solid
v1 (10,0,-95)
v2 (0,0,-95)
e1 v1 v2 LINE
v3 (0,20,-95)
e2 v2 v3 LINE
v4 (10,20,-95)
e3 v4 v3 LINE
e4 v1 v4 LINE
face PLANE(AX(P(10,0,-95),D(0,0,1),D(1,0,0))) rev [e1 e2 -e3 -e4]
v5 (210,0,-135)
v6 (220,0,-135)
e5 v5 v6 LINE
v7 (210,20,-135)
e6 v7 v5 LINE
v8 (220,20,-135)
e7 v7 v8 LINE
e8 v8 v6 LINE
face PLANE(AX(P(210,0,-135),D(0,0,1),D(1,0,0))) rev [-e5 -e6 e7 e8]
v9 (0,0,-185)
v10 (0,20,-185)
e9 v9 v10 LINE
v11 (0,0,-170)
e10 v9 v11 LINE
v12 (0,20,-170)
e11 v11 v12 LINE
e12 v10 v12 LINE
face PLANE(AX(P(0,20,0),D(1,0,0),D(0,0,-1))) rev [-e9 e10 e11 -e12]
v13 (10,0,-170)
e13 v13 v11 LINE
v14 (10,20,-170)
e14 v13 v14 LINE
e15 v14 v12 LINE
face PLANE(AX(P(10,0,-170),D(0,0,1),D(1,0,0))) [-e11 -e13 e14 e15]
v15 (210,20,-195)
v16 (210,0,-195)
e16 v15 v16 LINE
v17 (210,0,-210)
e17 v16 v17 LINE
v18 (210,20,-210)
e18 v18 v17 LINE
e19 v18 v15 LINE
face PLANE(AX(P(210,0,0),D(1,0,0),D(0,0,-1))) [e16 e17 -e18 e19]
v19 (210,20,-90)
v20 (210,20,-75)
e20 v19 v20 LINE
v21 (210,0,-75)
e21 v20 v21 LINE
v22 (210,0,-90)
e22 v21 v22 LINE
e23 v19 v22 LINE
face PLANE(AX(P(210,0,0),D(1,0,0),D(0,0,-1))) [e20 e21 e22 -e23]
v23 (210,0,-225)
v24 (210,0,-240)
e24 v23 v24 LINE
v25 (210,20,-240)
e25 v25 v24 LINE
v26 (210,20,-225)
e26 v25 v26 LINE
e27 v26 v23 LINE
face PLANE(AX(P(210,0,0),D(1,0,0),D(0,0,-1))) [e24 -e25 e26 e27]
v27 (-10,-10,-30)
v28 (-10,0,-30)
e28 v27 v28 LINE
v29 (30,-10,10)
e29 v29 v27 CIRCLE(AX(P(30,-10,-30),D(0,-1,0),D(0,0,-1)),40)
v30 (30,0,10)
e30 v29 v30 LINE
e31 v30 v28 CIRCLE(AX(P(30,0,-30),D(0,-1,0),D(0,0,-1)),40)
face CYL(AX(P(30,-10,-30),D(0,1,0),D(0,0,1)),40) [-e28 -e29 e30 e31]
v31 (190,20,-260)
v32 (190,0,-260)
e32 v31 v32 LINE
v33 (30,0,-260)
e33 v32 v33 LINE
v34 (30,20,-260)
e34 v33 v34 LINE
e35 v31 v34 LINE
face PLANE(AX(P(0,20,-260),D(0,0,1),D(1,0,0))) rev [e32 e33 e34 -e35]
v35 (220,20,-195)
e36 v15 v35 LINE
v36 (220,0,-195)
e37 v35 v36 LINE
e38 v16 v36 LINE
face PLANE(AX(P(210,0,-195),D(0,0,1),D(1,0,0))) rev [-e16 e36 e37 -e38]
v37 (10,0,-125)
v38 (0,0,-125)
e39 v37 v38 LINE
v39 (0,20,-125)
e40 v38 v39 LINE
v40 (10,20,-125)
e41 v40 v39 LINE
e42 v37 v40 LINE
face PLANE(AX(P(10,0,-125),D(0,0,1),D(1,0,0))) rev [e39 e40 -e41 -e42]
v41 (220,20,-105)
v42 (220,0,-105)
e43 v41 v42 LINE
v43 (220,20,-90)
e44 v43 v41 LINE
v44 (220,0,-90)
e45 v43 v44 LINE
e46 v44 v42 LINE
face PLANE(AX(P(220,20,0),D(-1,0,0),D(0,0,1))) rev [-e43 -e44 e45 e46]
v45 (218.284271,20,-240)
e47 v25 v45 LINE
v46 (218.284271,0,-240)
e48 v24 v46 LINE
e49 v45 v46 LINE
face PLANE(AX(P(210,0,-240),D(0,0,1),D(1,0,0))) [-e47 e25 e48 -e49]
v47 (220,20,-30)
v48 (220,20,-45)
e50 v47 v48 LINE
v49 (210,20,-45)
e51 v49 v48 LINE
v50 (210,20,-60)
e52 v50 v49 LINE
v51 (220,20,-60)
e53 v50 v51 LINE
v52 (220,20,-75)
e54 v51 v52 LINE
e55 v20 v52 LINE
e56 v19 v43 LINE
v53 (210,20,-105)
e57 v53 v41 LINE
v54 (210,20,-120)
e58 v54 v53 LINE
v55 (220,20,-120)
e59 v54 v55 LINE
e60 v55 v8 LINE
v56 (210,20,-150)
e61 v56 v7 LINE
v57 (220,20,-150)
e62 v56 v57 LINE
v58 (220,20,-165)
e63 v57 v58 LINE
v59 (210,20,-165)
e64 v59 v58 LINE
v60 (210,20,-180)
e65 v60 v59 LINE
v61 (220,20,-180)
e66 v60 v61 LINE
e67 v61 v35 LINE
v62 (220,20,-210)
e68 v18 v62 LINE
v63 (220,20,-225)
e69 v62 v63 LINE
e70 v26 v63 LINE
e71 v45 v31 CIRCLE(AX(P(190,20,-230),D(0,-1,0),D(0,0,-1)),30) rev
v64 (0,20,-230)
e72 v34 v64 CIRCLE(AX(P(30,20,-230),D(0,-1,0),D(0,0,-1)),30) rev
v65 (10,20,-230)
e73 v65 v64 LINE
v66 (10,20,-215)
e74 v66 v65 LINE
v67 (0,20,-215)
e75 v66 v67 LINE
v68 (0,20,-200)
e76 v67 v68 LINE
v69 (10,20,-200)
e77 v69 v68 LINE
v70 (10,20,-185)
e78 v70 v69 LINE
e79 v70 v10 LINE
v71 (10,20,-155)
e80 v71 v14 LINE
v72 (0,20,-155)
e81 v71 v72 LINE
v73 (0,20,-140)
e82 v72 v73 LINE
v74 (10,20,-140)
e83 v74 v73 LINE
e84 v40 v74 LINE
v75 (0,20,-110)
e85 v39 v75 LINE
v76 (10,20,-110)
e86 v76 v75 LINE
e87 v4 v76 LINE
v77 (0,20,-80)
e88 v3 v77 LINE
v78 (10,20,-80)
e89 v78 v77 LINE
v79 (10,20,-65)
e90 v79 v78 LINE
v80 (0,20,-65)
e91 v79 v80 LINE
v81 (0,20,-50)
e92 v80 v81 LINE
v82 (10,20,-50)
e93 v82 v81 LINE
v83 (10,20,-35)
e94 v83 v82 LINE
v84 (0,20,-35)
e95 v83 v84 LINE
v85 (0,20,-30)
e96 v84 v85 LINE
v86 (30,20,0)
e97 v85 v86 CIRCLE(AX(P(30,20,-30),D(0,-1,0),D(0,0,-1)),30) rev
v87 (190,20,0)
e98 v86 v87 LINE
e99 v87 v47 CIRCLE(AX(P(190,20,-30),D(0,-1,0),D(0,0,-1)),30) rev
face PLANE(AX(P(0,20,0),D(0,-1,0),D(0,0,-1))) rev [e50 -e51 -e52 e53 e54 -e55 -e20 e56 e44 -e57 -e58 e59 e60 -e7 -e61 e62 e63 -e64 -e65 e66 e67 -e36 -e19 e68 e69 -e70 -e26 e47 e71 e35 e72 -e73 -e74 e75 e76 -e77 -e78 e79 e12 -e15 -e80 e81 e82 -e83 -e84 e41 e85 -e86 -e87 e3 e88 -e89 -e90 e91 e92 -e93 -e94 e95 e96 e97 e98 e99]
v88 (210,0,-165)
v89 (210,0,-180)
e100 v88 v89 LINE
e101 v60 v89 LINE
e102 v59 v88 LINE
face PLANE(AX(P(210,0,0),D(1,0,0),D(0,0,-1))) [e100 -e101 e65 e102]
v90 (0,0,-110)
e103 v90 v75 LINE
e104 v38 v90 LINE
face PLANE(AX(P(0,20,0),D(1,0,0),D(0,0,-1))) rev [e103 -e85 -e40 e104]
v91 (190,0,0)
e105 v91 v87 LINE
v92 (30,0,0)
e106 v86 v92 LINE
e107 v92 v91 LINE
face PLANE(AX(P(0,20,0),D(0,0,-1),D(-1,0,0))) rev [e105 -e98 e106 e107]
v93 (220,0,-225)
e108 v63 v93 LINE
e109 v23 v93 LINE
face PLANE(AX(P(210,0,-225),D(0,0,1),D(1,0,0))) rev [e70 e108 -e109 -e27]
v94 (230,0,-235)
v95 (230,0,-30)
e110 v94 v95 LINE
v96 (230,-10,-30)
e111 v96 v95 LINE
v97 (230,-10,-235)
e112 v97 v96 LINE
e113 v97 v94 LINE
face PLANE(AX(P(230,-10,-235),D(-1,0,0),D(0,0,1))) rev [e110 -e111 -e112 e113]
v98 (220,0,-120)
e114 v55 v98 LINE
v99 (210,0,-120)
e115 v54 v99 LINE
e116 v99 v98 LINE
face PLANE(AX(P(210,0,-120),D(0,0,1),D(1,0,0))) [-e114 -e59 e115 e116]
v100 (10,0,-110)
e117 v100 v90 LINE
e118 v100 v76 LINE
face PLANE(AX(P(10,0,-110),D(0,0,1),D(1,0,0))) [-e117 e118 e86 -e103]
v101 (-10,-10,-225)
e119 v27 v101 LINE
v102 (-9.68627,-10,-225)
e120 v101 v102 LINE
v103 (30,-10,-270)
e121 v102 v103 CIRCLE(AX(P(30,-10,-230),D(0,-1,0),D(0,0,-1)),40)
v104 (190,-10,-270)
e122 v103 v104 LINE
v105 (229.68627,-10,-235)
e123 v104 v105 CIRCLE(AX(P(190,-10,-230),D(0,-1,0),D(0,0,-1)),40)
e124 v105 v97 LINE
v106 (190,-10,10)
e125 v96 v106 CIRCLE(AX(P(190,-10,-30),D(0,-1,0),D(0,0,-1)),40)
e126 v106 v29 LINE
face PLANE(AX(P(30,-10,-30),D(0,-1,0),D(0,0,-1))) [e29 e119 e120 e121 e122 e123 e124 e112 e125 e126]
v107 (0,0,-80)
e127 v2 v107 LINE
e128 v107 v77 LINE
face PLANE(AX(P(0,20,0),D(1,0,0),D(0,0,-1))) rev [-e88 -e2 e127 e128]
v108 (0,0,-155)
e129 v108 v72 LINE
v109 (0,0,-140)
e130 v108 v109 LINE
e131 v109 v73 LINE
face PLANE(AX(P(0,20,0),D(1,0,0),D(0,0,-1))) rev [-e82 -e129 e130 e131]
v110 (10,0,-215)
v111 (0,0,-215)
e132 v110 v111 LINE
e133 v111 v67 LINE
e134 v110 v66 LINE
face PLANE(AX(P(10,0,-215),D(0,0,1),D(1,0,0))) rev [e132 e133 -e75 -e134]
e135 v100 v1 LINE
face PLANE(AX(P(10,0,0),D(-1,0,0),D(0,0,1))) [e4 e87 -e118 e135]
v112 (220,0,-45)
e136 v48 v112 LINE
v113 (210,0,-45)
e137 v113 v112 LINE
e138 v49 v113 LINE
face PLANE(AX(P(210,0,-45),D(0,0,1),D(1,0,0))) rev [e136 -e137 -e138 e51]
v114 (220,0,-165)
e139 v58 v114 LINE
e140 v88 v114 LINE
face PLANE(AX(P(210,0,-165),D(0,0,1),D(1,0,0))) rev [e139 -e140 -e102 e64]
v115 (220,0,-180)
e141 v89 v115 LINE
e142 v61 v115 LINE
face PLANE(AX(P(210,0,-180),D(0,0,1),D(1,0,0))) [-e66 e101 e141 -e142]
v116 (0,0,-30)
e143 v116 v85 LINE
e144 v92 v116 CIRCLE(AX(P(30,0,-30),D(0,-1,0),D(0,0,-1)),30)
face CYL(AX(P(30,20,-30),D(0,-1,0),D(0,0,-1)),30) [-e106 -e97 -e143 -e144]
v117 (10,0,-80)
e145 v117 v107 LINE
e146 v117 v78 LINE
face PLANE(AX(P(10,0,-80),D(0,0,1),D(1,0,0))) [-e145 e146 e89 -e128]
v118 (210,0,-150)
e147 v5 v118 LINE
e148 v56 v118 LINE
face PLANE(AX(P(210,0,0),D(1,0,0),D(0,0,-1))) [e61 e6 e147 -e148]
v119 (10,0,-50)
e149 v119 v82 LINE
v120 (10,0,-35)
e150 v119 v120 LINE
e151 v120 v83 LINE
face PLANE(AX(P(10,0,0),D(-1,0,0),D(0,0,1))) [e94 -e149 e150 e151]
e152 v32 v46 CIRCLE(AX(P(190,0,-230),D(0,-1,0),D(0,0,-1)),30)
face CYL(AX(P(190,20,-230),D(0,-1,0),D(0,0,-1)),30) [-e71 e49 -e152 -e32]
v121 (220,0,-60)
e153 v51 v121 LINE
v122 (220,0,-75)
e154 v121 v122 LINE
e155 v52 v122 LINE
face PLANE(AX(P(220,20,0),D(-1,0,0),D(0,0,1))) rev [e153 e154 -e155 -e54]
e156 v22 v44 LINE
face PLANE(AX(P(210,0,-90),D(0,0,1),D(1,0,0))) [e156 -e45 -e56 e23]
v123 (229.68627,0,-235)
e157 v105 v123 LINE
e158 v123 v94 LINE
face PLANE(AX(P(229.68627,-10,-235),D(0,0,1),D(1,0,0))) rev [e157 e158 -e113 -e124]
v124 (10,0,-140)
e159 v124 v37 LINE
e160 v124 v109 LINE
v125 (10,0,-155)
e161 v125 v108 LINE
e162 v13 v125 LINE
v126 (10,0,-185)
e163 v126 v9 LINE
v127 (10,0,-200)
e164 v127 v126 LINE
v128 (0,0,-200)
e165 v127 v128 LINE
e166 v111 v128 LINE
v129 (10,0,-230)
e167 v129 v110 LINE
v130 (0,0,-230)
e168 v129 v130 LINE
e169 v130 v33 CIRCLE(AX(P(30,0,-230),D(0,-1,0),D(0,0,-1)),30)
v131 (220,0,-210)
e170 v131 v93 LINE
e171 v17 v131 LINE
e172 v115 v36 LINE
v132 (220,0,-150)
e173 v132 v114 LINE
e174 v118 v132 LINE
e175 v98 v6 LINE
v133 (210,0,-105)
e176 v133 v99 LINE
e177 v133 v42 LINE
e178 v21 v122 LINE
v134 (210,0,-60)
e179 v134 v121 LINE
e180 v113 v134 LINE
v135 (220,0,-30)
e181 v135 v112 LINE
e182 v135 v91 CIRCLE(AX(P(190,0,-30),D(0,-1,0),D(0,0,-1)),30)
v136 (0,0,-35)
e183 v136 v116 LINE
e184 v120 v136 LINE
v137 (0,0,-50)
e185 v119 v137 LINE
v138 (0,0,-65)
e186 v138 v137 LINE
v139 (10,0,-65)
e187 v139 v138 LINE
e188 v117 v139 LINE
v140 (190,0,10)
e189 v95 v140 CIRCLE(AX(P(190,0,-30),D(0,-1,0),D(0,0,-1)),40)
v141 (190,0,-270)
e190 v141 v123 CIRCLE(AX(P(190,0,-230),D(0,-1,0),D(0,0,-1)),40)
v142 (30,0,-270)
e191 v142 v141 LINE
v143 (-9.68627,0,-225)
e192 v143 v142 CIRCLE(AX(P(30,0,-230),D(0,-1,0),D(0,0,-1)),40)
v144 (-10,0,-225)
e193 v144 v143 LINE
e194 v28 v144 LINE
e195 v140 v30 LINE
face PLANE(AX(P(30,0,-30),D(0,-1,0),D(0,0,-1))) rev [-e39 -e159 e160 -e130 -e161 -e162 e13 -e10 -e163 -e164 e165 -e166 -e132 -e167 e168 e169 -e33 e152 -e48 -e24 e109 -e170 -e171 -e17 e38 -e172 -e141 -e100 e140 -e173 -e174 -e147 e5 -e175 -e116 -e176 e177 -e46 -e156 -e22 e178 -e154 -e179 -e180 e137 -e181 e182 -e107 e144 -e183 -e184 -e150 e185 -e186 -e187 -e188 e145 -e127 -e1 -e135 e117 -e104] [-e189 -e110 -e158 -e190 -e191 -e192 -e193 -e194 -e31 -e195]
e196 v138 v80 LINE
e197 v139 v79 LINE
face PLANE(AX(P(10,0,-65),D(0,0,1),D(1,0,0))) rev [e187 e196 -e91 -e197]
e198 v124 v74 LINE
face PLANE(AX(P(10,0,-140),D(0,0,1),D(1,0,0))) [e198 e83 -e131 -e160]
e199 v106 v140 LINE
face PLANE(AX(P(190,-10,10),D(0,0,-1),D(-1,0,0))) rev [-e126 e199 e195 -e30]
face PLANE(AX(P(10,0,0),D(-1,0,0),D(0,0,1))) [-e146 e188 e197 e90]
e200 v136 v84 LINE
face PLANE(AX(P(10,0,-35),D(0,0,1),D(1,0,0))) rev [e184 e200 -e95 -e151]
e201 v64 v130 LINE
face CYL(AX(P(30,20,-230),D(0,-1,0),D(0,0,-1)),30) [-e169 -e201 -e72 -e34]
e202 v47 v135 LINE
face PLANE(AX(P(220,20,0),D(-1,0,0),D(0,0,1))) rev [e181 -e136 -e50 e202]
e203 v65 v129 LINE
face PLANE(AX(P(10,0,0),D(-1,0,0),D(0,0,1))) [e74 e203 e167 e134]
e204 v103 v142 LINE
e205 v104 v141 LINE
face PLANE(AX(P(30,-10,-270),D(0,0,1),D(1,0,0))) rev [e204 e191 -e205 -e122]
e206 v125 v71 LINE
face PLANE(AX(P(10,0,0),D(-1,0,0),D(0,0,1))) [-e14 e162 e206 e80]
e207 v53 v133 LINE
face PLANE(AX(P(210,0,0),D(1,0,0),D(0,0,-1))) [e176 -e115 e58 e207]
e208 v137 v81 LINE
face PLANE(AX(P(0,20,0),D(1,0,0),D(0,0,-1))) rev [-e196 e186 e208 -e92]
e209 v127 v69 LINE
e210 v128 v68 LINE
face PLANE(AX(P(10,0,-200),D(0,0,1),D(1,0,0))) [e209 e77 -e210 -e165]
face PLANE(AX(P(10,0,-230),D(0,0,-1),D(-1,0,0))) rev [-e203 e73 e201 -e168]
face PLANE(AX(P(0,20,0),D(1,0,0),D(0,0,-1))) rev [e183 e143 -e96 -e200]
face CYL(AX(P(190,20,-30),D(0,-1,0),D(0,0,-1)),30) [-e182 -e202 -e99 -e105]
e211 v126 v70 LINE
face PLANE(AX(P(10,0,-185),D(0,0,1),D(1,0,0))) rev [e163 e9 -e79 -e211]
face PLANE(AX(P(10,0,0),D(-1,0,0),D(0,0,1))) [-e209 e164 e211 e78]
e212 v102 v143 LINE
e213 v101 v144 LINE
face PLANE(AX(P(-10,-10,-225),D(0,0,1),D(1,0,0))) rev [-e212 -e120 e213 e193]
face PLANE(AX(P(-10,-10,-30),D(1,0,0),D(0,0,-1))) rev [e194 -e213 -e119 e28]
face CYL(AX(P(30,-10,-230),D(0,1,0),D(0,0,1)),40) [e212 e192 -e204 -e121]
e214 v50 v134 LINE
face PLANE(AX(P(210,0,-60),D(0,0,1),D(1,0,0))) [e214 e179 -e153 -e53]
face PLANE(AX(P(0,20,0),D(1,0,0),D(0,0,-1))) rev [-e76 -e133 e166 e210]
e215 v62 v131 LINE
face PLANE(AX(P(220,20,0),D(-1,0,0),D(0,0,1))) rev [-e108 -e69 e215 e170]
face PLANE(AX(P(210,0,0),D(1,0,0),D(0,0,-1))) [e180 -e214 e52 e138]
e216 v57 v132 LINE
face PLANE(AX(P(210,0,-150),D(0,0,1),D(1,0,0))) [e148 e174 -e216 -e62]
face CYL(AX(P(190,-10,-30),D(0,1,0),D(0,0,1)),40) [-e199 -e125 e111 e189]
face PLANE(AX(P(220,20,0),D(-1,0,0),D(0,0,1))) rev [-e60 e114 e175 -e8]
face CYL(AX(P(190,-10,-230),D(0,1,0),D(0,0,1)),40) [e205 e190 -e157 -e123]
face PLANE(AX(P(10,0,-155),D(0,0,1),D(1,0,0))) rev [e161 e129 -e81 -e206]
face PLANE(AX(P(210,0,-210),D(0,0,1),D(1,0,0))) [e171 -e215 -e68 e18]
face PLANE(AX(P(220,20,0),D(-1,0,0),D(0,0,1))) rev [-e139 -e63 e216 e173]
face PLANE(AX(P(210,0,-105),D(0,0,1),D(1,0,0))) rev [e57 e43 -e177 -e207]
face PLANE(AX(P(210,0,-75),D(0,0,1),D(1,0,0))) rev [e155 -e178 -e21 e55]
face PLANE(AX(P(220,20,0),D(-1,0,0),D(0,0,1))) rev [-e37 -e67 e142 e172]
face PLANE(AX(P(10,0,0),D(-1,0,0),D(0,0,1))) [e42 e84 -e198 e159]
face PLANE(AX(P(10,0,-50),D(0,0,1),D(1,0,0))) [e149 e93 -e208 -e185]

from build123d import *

# Parameters (mm, degrees)
SKETCH1_W              = 220
SKETCH1_H              = 260
BOSS_EXTRUDE1_DEPTH    = 20
FILLET1_R              = 30
CUT_EXTRUDE1_START     = -10
CUT_EXTRUDE1_OUTLINE_W = 15
CUT_EXTRUDE1_OUTLINE_H = 20
CUT_EXTRUDE1_DEPTH     = 10
SKETCH8_W              = 15
SKETCH8_H              = 20
CUT_EXTRUDE2_DEPTH     = 10
BOSS_EXTRUDE3_DEPTH    = 10


# Read off the part's stored shape, not the designer's step: Cut-Extrude1
with BuildPart() as part:
    # Sketch1 → Boss-Extrude1 (new body)
    with BuildSketch(Plane(origin=(0, 0, 0), x_dir=(1, 0, 0), z_dir=(0, 1, 0))):
        with Locations((110, 130)):
            Rectangle(SKETCH1_W, SKETCH1_H)
    extrude(amount=BOSS_EXTRUDE1_DEPTH)

    # Fillet1
    fillet1_edges = [part.edges().sort_by_distance(p)[0] for p in [
        (0, 10, -260),
        (220, 10, -260),
        (220, 10, 0),
        (0, 10, 0),
    ]]
    fillet(fillet1_edges, radius=FILLET1_R)

    # Cut-Extrude1 outline → Cut-Extrude1 (cut)
    with BuildSketch(Plane(origin=(220, 0, 0), x_dir=(0, 0, -1), z_dir=(1, 0, 0)).offset(CUT_EXTRUDE1_START)):
        with Locations((232.5, 10)):
            Rectangle(CUT_EXTRUDE1_OUTLINE_W, CUT_EXTRUDE1_OUTLINE_H)
        with Locations((202.5, 10)):
            Rectangle(CUT_EXTRUDE1_OUTLINE_W, CUT_EXTRUDE1_OUTLINE_H)
        with Locations((172.5, 10)):
            Rectangle(CUT_EXTRUDE1_OUTLINE_W, CUT_EXTRUDE1_OUTLINE_H)
        with Locations((142.5, 10)):
            Rectangle(CUT_EXTRUDE1_OUTLINE_W, CUT_EXTRUDE1_OUTLINE_H)
        with Locations((112.5, 10)):
            Rectangle(CUT_EXTRUDE1_OUTLINE_W, CUT_EXTRUDE1_OUTLINE_H)
        with Locations((82.5, 10)):
            Rectangle(CUT_EXTRUDE1_OUTLINE_W, CUT_EXTRUDE1_OUTLINE_H)
        with Locations((52.5, 10)):
            Rectangle(CUT_EXTRUDE1_OUTLINE_W, CUT_EXTRUDE1_OUTLINE_H)
    extrude(amount=CUT_EXTRUDE1_DEPTH, mode=Mode.SUBTRACT)

    # Sketch8 → Cut-Extrude2 (cut)
    with BuildSketch(Plane.ZY):
        with Locations((-222.5, 10)):
            Rectangle(SKETCH8_W, SKETCH8_H)
        with Locations((-192.5, 10)):
            Rectangle(SKETCH8_W, SKETCH8_H)
        with Locations((-162.5, 10)):
            Rectangle(SKETCH8_W, SKETCH8_H)
        with Locations((-132.5, 10)):
            Rectangle(SKETCH8_W, SKETCH8_H)
        with Locations((-102.5, 10)):
            Rectangle(SKETCH8_W, SKETCH8_H)
        with Locations((-72.5, 10)):
            Rectangle(SKETCH8_W, SKETCH8_H)
        with Locations((-42.5, 10)):
            Rectangle(SKETCH8_W, SKETCH8_H)
    extrude(amount=-CUT_EXTRUDE2_DEPTH, mode=Mode.SUBTRACT)

    # Sketch11 → Boss-Extrude3 (add)
    with BuildSketch(Plane.XZ):
        with BuildLine():
            Line((229.686269666, -235), (230, -235))
            Line((230, -235), (230, -30))
            ThreePointArc((230, -30), (218.284271247, -1.715728753), (190, 10))
            Line((190, 10), (30, 10))
            ThreePointArc((30, 10), (1.715728753, -1.715728753), (-10, -30))
            Line((-10, -30), (-10, -225))
            Line((-10, -225), (-9.686269666, -225))
            ThreePointArc((-9.686269666, -225), (0, -256.457513111), (30, -270))
            Line((30, -270), (190, -270))
            ThreePointArc((190, -270), (216.457513111, -260), (229.686269666, -235))
        make_face()
    extrude(amount=BOSS_EXTRUDE3_DEPTH)


solid = part.part
